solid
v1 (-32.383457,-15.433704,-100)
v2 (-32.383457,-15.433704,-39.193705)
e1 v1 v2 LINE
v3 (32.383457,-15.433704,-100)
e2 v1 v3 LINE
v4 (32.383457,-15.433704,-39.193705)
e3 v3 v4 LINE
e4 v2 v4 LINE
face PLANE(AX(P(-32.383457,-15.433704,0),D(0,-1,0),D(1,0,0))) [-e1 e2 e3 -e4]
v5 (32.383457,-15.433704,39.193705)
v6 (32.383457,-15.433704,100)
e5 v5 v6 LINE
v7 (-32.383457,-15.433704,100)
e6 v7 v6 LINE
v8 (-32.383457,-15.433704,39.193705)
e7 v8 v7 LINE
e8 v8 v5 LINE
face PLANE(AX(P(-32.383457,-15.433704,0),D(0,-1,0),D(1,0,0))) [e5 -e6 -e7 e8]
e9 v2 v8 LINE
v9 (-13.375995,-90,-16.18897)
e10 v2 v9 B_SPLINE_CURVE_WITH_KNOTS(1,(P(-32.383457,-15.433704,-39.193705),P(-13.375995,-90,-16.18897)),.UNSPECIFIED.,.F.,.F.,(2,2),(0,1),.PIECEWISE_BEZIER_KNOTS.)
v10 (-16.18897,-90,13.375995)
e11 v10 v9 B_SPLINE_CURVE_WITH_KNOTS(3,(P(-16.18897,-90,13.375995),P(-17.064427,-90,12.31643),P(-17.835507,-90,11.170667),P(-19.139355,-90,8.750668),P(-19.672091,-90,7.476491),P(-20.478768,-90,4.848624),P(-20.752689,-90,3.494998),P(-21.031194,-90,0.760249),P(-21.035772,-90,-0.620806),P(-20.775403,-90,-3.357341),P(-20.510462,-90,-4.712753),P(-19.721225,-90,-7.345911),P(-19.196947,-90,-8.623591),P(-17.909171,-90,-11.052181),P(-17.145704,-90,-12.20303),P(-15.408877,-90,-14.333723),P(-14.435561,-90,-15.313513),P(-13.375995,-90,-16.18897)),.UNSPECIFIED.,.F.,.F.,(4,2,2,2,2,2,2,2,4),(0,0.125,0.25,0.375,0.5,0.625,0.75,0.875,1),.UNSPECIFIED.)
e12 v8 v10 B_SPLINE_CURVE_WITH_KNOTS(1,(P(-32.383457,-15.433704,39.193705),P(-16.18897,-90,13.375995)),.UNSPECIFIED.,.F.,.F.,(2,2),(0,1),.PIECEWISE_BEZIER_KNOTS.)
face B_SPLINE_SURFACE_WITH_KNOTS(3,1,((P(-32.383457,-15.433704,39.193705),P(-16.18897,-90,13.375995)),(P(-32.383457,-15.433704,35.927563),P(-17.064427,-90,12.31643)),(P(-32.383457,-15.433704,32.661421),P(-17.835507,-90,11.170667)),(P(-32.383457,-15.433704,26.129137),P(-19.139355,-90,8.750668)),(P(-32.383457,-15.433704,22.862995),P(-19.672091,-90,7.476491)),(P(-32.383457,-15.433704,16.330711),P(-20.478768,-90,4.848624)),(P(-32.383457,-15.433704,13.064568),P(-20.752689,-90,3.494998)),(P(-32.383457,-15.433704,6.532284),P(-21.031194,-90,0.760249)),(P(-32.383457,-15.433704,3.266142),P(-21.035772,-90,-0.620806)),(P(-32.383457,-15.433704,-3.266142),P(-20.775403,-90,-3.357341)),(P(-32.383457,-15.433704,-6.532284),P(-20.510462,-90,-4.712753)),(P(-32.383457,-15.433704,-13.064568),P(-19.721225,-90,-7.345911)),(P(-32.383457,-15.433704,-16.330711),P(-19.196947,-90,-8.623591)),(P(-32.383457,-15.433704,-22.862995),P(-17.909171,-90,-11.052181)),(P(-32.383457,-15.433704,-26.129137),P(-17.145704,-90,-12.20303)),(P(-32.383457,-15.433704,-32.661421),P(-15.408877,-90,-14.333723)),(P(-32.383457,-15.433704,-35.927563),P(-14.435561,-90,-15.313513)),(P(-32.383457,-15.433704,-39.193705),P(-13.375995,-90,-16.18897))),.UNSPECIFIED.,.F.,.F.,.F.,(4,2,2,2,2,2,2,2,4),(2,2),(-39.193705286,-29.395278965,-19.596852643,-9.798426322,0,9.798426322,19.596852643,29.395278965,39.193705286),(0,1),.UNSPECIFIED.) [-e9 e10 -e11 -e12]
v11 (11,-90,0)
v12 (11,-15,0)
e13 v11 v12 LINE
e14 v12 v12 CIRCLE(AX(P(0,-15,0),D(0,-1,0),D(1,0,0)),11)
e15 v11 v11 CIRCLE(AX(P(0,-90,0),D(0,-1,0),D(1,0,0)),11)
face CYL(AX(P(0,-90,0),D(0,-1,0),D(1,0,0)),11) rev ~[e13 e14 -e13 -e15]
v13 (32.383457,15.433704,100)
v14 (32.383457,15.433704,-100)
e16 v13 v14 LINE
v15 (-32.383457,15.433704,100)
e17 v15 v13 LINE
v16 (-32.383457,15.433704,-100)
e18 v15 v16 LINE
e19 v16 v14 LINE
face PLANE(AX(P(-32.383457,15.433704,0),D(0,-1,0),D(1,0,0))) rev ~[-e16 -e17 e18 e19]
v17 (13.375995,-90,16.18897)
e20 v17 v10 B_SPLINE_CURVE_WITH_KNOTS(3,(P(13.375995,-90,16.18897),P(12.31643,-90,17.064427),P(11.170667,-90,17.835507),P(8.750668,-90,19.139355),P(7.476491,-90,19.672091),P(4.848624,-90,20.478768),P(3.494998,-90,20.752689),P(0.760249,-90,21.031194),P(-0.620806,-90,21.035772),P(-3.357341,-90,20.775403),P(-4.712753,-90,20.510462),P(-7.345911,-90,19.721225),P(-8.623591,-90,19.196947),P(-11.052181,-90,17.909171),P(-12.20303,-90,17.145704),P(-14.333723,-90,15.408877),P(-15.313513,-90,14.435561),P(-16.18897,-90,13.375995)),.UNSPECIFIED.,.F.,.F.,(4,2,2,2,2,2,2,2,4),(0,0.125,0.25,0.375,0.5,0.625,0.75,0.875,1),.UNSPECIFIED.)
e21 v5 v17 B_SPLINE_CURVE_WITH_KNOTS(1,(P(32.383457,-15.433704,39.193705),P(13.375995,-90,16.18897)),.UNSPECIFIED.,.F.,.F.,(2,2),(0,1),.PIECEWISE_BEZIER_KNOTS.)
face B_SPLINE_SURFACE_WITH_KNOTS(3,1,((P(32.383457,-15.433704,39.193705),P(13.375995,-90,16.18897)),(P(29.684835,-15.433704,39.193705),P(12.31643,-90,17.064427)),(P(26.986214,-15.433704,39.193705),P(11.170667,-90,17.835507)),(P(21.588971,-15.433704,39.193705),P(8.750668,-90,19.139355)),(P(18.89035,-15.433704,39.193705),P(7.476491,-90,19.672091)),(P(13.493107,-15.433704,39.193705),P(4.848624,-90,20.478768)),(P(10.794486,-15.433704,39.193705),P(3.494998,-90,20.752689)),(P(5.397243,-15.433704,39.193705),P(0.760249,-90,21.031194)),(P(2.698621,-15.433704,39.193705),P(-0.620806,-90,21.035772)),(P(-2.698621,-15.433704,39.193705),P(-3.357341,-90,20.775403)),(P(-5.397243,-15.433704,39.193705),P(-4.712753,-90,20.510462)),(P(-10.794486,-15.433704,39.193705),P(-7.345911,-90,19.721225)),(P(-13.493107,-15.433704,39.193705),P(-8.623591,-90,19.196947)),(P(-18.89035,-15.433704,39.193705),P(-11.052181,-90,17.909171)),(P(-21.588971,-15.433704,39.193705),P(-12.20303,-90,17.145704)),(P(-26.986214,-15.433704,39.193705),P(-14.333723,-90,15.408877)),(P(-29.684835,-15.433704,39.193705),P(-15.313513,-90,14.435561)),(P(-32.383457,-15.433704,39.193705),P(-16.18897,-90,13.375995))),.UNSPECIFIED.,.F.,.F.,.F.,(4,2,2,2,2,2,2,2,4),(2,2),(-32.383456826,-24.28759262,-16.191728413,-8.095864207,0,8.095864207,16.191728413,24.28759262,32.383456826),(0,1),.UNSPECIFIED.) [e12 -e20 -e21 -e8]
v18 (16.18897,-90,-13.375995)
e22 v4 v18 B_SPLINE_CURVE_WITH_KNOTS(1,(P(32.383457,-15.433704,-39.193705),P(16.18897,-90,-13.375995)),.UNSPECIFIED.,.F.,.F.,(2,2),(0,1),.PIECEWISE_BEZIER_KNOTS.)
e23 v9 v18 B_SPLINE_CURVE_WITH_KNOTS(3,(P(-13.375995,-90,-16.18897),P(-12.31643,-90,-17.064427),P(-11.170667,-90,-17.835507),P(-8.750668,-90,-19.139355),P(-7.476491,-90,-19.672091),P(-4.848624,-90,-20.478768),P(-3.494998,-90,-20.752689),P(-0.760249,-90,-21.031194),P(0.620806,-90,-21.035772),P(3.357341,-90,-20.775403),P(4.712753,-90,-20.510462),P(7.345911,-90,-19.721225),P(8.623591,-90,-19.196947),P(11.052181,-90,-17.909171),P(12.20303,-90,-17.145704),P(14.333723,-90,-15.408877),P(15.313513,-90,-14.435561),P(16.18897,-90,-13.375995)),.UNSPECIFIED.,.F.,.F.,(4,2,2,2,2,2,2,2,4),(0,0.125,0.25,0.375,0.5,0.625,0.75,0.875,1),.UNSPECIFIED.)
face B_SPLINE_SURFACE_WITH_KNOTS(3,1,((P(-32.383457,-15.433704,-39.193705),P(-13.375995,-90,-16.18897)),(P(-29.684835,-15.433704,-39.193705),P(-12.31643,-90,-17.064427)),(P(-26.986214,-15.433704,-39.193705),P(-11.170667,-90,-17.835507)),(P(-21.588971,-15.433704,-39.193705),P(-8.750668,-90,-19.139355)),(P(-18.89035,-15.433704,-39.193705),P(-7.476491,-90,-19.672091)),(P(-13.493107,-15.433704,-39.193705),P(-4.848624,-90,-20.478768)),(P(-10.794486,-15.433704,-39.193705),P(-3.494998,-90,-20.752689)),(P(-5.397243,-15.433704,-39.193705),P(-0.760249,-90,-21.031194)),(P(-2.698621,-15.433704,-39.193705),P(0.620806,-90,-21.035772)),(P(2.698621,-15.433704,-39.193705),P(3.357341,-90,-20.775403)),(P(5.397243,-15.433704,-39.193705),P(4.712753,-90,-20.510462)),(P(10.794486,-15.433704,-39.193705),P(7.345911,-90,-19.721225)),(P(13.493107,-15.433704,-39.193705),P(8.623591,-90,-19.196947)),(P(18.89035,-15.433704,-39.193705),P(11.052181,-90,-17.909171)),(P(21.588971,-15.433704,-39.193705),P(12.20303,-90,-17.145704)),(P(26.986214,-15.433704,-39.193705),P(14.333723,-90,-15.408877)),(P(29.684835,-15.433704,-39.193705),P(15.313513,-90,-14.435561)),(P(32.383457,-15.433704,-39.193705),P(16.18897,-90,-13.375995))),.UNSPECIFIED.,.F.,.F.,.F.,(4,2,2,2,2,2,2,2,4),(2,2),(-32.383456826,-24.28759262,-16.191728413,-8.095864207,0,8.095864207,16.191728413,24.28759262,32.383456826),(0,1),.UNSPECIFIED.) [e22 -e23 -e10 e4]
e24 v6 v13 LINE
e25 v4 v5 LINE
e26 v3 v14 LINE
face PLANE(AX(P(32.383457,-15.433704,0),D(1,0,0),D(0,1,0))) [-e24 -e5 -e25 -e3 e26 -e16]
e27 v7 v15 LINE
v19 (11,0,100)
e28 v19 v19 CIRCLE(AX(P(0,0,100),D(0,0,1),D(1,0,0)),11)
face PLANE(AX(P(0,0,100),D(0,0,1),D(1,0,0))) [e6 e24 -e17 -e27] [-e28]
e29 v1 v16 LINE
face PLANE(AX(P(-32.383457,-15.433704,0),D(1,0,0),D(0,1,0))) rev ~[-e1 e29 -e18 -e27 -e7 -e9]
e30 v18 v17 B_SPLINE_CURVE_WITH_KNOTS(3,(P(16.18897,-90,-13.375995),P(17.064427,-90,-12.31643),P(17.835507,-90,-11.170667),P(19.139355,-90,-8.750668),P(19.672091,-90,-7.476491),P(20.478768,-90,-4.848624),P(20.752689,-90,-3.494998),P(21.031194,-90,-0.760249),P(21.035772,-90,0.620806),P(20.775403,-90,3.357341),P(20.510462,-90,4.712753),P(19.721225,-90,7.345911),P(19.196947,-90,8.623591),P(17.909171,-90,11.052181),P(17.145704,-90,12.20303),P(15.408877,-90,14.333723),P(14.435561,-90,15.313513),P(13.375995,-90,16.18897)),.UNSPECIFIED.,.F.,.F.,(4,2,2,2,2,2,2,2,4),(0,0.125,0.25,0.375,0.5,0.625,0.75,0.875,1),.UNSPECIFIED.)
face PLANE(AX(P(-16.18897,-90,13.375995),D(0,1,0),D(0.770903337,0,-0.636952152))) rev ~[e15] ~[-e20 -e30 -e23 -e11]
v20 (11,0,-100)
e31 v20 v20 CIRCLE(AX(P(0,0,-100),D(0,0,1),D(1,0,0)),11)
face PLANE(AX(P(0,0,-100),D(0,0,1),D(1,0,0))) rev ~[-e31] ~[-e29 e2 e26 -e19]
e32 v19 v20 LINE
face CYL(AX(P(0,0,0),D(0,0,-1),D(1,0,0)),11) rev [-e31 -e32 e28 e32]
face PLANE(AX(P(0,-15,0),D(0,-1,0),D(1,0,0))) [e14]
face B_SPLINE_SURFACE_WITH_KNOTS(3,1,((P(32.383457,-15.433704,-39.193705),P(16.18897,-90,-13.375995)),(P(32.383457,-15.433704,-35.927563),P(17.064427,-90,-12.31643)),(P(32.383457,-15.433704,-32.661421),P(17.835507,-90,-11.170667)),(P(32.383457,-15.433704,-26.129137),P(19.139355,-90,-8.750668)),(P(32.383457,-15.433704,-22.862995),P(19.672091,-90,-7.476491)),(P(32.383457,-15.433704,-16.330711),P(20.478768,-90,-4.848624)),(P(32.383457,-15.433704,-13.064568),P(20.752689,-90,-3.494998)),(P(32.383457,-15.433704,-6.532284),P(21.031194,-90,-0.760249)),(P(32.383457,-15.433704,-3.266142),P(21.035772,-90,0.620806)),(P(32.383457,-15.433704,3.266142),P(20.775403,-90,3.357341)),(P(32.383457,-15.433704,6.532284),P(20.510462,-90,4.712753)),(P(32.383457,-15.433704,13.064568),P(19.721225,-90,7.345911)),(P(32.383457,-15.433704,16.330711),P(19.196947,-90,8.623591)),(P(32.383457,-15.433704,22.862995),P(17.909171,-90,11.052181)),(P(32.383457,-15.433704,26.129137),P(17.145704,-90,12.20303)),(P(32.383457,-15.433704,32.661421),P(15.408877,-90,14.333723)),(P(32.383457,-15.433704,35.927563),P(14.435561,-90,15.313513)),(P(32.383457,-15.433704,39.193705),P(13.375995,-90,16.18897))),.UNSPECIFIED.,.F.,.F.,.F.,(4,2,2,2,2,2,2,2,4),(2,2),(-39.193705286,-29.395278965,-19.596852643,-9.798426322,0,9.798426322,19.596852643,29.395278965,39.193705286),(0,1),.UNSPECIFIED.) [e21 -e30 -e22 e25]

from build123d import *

# Parameters (mm, degrees)
F0_W     = 64.7669136524
F0_H     = 30.8674070984
F0_R     = 11
F1_DEPTH = 100
F4_W     = 64.7669136524
F4_H     = 78.3874105722
F6_R     = 11
F7_DEPTH = 75


# Not quite as in the source:
# - the arcs of a loft's sections are written as splines that run evenly, so that the points pair up as in the source's solid


with BuildPart() as f1:
    # F0 (on Top) → F1 (new body, symmetric)
    with BuildSketch(Plane.XY):
        Rectangle(F0_W, F0_H)
        Circle(F0_R, mode=Mode.SUBTRACT)
    extrude(amount=F1_DEPTH, both=True)

    # F4 (on face) → F5 section 0
    with BuildSketch(Plane.XZ.offset(15.4337035492)):
        Rectangle(F4_W, F4_H)
    # F3 (on offset) → F5 section 1
    with BuildSketch(Plane.XZ.offset(90)):
        with BuildLine():
            add(Edge.make_bspline(
                [(13.3759952004, 16.1889700845), (12.3164295861, 17.0644269232), (11.1706673311, 17.8355065906), (8.7506683017, 19.1393549588), (7.4764913666, 19.6720914194), (4.8486237419, 20.4787683169), (3.4949980316, 20.7526888071), (0.7602492908, 21.0311940931), (-0.6208061176, 21.0357720023), (-3.3573411141, 20.7754028748), (-4.7127530359, 20.5104622764), (-7.3459107829, 19.721224575), (-8.623591498, 19.1969469876), (-11.0521812199, 17.9091706745), (-12.203030175, 17.1457037918), (-14.3337225308, 15.4088773887), (-15.3135132459, 14.4355608147), (-16.1889700845, 13.3759952004)],
                knots=[0, 0, 0, 0, 0.125, 0.125, 0.25, 0.25, 0.375, 0.375, 0.5, 0.5, 0.625, 0.625, 0.75, 0.75, 0.875, 0.875, 1, 1, 1, 1], degree=3))
            add(Edge.make_bspline(
                [(-16.1889700845, 13.3759952004), (-17.0644269232, 12.3164295861), (-17.8355065906, 11.1706673311), (-19.1393549588, 8.7506683017), (-19.6720914194, 7.4764913666), (-20.4787683169, 4.8486237419), (-20.7526888071, 3.4949980316), (-21.0311940931, 0.7602492908), (-21.0357720023, -0.6208061176), (-20.7754028748, -3.3573411141), (-20.5104622764, -4.7127530359), (-19.721224575, -7.3459107829), (-19.1969469876, -8.623591498), (-17.9091706745, -11.0521812199), (-17.1457037918, -12.203030175), (-15.4088773887, -14.3337225308), (-14.4355608147, -15.3135132459), (-13.3759952004, -16.1889700845)],
                knots=[0, 0, 0, 0, 0.125, 0.125, 0.25, 0.25, 0.375, 0.375, 0.5, 0.5, 0.625, 0.625, 0.75, 0.75, 0.875, 0.875, 1, 1, 1, 1], degree=3))
            add(Edge.make_bspline(
                [(-13.3759952004, -16.1889700845), (-12.3164295861, -17.0644269232), (-11.1706673311, -17.8355065906), (-8.7506683017, -19.1393549588), (-7.4764913666, -19.6720914194), (-4.8486237419, -20.4787683169), (-3.4949980316, -20.7526888071), (-0.7602492908, -21.0311940931), (0.6208061176, -21.0357720023), (3.3573411141, -20.7754028748), (4.7127530359, -20.5104622764), (7.3459107829, -19.721224575), (8.623591498, -19.1969469876), (11.0521812199, -17.9091706745), (12.203030175, -17.1457037918), (14.3337225308, -15.4088773887), (15.3135132459, -14.4355608147), (16.1889700845, -13.3759952004)],
                knots=[0, 0, 0, 0, 0.125, 0.125, 0.25, 0.25, 0.375, 0.375, 0.5, 0.5, 0.625, 0.625, 0.75, 0.75, 0.875, 0.875, 1, 1, 1, 1], degree=3))
            add(Edge.make_bspline(
                [(16.1889700845, -13.3759952004), (17.0644269232, -12.3164295861), (17.8355065906, -11.1706673311), (19.1393549588, -8.7506683017), (19.6720914194, -7.4764913666), (20.4787683169, -4.8486237419), (20.7526888071, -3.4949980316), (21.0311940931, -0.7602492908), (21.0357720023, 0.6208061176), (20.7754028748, 3.3573411141), (20.5104622764, 4.7127530359), (19.721224575, 7.3459107829), (19.1969469876, 8.623591498), (17.9091706745, 11.0521812199), (17.1457037918, 12.203030175), (15.4088773887, 14.3337225308), (14.4355608147, 15.3135132459), (13.3759952004, 16.1889700845)],
                knots=[0, 0, 0, 0, 0.125, 0.125, 0.25, 0.25, 0.375, 0.375, 0.5, 0.5, 0.625, 0.625, 0.75, 0.75, 0.875, 0.875, 1, 1, 1, 1], degree=3))
        make_face()
    loft(ruled=True)

    # F6 (on face) → F7 (cut)
    with BuildSketch(Plane.XZ.offset(90)):
        Circle(F6_R)
    extrude(amount=-F7_DEPTH, mode=Mode.SUBTRACT)


solid = f1.part
